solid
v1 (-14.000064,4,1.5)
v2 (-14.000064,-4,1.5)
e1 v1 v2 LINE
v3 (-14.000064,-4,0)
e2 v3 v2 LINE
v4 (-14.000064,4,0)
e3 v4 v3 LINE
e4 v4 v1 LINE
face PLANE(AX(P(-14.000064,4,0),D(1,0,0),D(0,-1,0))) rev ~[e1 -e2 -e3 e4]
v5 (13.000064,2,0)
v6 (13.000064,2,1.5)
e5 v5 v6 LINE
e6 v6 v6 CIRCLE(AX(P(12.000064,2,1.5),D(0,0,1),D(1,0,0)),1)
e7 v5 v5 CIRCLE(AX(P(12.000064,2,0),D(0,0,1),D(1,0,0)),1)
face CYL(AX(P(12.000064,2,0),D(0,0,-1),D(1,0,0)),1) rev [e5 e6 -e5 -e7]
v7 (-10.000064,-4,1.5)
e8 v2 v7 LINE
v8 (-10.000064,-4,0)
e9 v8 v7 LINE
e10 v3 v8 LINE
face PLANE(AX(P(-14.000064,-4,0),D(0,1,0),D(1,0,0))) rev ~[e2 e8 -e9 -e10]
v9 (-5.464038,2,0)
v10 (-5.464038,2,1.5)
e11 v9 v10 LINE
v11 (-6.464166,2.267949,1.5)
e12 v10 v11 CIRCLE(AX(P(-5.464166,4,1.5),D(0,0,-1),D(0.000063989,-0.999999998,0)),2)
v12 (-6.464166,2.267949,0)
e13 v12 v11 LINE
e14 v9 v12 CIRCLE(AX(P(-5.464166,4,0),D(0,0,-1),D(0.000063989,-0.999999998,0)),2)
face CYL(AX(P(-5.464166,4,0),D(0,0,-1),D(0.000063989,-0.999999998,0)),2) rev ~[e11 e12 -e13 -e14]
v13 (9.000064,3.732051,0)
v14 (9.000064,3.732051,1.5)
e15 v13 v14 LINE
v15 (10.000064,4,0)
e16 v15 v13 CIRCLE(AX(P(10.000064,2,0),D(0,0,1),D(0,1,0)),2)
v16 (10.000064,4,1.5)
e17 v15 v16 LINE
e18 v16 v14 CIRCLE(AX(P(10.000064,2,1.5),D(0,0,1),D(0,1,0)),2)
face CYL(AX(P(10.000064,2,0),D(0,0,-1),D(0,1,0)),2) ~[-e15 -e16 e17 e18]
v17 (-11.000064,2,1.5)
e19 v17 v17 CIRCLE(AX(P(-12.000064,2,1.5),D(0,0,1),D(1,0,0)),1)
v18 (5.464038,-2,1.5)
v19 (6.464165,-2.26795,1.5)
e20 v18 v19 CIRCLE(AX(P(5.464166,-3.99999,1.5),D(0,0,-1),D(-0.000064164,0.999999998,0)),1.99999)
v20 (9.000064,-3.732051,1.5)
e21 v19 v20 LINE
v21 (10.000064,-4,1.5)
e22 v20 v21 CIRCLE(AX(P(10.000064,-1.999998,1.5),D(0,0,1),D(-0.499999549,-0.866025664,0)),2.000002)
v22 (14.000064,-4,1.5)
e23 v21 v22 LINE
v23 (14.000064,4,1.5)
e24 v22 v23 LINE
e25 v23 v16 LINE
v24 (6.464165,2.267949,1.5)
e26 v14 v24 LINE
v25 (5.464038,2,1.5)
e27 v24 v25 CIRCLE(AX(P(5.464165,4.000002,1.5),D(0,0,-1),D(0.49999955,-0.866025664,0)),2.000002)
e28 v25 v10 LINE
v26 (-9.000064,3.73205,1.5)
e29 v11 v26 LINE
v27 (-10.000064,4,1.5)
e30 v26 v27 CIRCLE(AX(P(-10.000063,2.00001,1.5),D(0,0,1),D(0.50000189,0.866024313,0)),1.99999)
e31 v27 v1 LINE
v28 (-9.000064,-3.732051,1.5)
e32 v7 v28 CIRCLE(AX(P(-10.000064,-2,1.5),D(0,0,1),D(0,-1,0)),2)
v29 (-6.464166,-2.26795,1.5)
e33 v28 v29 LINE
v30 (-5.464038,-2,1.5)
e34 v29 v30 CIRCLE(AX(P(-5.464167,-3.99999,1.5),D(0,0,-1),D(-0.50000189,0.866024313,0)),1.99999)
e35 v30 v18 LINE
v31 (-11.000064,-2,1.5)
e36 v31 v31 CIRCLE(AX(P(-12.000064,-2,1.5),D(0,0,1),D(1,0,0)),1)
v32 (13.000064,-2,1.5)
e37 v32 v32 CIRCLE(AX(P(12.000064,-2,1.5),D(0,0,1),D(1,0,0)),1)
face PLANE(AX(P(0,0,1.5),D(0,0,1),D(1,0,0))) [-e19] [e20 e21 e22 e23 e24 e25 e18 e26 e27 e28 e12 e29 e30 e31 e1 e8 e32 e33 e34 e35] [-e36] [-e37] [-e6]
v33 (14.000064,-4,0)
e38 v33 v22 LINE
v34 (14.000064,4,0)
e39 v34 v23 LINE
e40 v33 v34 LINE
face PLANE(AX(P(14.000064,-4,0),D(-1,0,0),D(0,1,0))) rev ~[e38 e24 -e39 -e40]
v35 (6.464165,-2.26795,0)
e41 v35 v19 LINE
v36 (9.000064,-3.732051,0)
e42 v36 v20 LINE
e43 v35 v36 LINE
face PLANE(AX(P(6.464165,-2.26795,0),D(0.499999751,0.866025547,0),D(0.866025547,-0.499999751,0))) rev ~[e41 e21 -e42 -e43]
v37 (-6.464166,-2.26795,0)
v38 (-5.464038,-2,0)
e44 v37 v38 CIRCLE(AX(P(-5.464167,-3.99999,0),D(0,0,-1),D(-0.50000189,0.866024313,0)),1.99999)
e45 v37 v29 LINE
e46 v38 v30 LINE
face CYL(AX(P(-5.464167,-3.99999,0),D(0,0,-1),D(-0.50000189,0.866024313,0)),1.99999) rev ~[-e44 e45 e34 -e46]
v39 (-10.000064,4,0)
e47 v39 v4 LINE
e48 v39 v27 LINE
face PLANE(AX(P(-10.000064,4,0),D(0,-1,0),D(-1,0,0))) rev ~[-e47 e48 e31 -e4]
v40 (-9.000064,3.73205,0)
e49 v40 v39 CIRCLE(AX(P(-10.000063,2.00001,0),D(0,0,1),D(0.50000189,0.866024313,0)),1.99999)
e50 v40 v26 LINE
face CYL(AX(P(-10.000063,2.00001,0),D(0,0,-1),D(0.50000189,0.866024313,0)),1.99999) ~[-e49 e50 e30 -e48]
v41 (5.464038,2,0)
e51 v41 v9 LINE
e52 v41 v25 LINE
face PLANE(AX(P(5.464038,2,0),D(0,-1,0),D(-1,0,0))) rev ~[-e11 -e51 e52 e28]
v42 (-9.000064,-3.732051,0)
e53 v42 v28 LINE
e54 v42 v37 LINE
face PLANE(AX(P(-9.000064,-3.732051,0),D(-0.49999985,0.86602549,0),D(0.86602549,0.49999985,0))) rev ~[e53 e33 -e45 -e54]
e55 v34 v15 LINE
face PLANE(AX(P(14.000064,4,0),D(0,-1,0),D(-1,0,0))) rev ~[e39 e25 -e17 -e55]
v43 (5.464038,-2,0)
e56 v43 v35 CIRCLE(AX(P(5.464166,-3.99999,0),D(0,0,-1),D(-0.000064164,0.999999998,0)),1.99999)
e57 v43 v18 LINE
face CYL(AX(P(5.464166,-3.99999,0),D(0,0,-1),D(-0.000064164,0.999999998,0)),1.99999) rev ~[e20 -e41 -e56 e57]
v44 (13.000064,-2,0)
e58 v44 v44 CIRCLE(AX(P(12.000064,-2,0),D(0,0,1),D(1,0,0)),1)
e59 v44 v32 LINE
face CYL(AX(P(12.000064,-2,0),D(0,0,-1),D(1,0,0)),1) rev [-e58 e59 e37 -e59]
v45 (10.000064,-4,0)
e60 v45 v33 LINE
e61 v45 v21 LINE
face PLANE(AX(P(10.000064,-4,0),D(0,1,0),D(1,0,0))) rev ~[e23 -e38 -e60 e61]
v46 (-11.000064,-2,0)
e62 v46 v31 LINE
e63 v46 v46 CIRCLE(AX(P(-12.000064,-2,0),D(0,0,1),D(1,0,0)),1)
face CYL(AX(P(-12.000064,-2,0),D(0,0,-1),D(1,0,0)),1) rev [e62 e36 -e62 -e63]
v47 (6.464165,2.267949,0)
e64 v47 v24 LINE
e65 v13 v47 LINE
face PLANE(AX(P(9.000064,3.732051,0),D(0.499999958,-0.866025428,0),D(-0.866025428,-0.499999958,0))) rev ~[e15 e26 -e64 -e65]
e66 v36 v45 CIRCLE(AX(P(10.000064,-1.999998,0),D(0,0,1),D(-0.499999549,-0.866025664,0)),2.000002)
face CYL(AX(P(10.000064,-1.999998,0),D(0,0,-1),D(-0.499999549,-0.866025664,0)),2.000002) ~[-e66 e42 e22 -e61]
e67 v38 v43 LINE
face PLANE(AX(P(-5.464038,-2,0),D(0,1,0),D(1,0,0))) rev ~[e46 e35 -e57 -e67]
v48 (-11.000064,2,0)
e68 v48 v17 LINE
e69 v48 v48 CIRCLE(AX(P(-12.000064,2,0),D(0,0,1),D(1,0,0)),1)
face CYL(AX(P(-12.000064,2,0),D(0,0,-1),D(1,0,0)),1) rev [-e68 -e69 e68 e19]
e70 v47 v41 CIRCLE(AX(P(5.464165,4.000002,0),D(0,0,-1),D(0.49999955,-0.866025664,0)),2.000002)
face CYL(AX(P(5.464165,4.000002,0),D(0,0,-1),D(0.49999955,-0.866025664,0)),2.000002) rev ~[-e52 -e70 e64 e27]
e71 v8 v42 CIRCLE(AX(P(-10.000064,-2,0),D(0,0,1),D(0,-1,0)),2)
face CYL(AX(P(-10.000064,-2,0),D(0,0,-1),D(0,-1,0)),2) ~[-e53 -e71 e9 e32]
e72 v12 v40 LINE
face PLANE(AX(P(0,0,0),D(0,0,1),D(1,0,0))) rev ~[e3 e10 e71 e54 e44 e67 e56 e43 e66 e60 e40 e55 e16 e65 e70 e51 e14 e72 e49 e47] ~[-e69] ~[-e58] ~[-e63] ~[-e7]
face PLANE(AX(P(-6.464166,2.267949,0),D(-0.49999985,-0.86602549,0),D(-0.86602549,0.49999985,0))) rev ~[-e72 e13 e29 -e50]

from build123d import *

# Parameters (mm, degrees)
F0_R     = 1
F1_DEPTH = 1.5


# Not quite as in the source:
# - ends of sketch curves that miss each other by under 0.0002 mm in the source are joined


with BuildPart() as f1:
    # F0 (on Top) → F1 (new body)
    with BuildSketch(Plane.XY):
        with BuildLine():
            Line((6.464165, -2.26795), (9.000064, -3.732051))
            ThreePointArc((9.000064, -3.732051), (9.4824259563, -3.931851665), (10.000064, -4))
            Line((10.000064, -4), (14.000064, -4))
            Line((14.000064, -4), (14.000064, 4))
            Line((14.000064, 4), (10.000064, 4))
            ThreePointArc((10.000064, 4), (9.4824257148, 3.9318516003), (9.0000636503, 3.7320506057))
            Line((9.0000636503, 3.7320506057), (6.464165, 2.267949))
            ThreePointArc((6.464165, 2.267949), (5.9817417072, 2.0681319009), (5.464038, 2.000000004))
            Line((5.464038, 2.000000004), (-5.464038, 2))
            ThreePointArc((-5.464038, 2), (-5.9817422242, 2.0681317715), (-6.4641659167, 2.2679491443))
            Line((-6.4641659167, 2.2679491443), (-9.000064, 3.73205))
            ThreePointArc((-9.000064, 3.73205), (-9.4824257148, 3.9318516003), (-10.000064, 4))
            Line((-10.000064, 4), (-14.000064, 4))
            Line((-14.000064, 4), (-14.000064, -4))
            Line((-14.000064, -4), (-10.000064, -4))
            ThreePointArc((-10.000064, -4), (-9.4824259563, -3.931851665), (-9.0000640833, -3.7320508557))
            Line((-9.0000640833, -3.7320508557), (-6.464166, -2.26795))
            ThreePointArc((-6.464166, -2.26795), (-5.9817424657, -2.0681318362), (-5.464038, -2.0000000041))
            Line((-5.464038, -2.0000000041), (5.464038, -2))
            ThreePointArc((5.464038, -2), (5.9817419487, -2.0681319656), (6.464165, -2.26795))
        make_face()
        with Locations((-12.000064, -2)):
            Circle(F0_R, mode=Mode.SUBTRACT)
        with Locations((12.000064, -2)):
            Circle(F0_R, mode=Mode.SUBTRACT)
        with Locations((-12.000064, 2)):
            Circle(F0_R, mode=Mode.SUBTRACT)
        with Locations((12.000064, 2)):
            Circle(F0_R, mode=Mode.SUBTRACT)
    extrude(amount=F1_DEPTH)


solid = f1.part
